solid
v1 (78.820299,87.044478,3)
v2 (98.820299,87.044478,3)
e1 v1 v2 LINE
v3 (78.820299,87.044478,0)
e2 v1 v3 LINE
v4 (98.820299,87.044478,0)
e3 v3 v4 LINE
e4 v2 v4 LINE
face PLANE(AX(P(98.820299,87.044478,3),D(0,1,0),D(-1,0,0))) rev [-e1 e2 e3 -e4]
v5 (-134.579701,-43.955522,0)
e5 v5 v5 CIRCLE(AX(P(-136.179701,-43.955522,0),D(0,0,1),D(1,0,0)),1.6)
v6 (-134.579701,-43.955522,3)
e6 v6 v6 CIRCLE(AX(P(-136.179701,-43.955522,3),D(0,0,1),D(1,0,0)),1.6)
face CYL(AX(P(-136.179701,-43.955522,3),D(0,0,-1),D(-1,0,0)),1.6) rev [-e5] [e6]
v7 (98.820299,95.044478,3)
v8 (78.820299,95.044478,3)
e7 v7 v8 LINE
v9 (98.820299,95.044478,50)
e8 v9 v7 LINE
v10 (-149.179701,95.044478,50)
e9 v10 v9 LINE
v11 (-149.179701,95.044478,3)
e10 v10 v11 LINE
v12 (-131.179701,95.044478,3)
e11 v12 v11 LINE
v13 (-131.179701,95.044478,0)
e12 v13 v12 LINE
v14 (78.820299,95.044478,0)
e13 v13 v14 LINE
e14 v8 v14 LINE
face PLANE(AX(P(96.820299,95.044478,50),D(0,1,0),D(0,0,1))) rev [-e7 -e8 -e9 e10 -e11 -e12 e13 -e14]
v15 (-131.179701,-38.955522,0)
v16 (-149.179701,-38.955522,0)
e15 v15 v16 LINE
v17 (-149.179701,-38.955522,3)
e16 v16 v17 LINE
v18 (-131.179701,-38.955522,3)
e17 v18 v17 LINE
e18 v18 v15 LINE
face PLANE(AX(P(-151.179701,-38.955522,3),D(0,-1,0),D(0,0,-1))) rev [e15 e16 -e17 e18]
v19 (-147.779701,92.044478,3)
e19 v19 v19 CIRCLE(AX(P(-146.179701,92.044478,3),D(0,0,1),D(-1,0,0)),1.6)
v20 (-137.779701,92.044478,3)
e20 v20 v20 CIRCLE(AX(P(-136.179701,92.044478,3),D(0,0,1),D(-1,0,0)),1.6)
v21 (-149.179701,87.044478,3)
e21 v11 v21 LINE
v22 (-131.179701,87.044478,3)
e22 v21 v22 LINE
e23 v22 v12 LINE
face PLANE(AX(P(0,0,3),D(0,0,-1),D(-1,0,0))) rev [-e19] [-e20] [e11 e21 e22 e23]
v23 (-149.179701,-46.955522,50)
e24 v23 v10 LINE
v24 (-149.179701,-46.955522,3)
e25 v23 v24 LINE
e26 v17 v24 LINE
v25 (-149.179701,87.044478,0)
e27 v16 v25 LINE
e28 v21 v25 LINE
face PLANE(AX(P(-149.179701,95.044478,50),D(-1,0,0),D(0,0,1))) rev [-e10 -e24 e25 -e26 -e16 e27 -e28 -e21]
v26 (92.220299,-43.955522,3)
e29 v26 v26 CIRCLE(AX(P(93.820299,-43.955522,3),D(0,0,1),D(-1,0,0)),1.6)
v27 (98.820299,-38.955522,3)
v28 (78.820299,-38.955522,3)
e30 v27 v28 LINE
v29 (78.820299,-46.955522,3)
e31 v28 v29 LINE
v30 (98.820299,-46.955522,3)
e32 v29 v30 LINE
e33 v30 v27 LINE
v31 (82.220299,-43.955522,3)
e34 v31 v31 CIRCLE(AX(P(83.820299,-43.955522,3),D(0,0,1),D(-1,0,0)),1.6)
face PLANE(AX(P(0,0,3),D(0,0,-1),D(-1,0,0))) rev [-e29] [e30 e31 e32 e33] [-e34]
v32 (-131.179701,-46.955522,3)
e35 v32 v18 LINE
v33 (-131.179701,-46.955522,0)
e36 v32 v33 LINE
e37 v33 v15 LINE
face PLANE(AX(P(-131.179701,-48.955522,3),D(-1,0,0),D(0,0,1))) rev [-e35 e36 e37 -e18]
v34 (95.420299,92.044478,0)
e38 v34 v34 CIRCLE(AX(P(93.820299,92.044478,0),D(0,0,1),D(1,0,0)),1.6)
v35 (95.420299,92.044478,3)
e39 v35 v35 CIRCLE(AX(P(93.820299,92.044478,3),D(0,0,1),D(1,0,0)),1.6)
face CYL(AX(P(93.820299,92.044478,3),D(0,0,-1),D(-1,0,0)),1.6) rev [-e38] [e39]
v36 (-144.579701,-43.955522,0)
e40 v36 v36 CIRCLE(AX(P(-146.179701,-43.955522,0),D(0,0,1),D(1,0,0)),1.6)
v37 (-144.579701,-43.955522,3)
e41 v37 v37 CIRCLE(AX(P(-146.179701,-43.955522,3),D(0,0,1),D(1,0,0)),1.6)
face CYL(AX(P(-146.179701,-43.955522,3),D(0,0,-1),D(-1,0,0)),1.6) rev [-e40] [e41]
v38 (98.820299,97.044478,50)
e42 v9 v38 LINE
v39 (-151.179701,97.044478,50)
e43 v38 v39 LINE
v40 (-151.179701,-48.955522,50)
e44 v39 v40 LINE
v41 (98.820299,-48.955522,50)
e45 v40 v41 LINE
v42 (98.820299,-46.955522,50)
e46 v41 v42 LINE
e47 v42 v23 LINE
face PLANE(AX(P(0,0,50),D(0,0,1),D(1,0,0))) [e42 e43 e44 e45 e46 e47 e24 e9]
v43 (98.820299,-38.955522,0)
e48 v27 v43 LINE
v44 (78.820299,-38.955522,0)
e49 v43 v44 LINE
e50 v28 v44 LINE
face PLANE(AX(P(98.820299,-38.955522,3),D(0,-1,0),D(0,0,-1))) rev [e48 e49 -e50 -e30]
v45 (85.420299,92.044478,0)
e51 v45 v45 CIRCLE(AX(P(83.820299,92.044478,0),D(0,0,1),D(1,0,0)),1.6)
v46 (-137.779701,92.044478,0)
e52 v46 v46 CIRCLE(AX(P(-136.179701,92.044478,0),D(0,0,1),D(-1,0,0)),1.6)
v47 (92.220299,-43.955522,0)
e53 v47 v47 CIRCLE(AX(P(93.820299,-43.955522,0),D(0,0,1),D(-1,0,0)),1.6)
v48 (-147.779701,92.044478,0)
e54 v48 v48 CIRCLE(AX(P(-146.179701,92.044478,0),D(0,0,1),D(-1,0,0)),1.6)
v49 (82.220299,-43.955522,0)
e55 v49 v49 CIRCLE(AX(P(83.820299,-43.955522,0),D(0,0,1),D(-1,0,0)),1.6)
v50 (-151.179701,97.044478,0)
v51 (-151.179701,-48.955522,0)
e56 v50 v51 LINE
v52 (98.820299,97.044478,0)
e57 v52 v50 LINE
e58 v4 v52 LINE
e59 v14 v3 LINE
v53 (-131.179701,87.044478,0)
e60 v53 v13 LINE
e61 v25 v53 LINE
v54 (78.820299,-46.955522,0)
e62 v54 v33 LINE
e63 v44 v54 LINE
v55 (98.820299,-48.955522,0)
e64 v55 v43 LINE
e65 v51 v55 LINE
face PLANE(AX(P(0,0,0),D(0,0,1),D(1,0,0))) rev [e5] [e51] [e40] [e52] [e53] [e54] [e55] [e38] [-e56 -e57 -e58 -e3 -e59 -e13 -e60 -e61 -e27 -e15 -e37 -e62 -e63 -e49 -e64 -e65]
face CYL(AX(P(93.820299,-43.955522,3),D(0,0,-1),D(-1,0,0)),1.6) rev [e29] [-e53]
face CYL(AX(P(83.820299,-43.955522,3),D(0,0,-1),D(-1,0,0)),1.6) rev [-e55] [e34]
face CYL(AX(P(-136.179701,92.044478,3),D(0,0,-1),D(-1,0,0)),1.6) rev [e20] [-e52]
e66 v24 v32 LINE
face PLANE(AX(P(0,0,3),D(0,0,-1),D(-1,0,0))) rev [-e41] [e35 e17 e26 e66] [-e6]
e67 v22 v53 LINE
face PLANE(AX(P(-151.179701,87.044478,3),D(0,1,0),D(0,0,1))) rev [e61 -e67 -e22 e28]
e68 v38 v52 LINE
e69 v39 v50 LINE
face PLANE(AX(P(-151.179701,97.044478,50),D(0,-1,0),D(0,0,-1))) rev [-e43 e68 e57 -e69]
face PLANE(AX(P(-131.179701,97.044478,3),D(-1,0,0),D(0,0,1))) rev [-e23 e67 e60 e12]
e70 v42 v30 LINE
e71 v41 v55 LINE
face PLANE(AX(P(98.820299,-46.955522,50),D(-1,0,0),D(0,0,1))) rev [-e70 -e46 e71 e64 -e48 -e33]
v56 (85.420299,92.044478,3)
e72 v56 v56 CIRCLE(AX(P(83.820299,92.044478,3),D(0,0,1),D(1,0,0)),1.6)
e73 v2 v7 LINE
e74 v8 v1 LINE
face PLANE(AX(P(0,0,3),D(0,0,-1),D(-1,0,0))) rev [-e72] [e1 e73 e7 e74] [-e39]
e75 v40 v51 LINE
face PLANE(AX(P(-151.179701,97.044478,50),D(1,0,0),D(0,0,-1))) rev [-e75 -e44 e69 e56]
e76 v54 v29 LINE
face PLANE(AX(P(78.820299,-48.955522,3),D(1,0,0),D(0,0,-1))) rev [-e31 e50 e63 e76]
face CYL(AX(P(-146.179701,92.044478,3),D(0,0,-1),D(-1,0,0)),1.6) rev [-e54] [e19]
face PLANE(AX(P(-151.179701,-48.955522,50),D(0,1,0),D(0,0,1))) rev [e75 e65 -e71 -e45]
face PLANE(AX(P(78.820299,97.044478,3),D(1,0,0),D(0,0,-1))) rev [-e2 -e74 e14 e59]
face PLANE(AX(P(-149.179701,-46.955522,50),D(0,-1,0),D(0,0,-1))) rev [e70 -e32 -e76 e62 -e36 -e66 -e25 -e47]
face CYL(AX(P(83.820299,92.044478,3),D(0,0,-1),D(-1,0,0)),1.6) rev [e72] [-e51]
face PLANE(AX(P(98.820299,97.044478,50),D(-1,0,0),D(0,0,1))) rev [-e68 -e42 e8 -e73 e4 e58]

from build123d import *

# Parameters (mm, degrees)
EXTRUDE_1_DEPTH = 50
SKETCH_2_W      = 20
SKETCH_2_H      = 10
SKETCH_2_R      = 1.6
EXTRUDE_2_DEPTH = 3


with BuildPart() as part:
    # 草图1 → 凸台-拉伸1 (new body)
    with BuildSketch(Plane.XY):
        Polygon((-151.179701436, 97.04447756), (98.820298564, 97.04447756), (98.820298564, 95.04447756), (96.820298564, 95.04447756), (-149.179701436, 95.04447756), (-149.179701436, -46.95552244), (96.820298564, -46.95552244), (98.820298564, -46.95552244), (98.820298564, -48.95552244), (-151.179701436, -48.95552244), align=None)
    extrude(amount=EXTRUDE_1_DEPTH)

    # 草图2 → 凸台-拉伸2 (add)
    # profile 1 of 4: a face of its own
    with BuildSketch(Plane.XY):
        with Locations((-141.179701436, -43.95552244)):
            Rectangle(SKETCH_2_W, SKETCH_2_H)
        with Locations((-146.179701436, -43.95552244)):
            Circle(SKETCH_2_R, mode=Mode.SUBTRACT)
        with Locations((-136.179701436, -43.95552244)):
            Circle(SKETCH_2_R, mode=Mode.SUBTRACT)
    # profile 2 of 4: a face of its own
    with BuildSketch(Plane.XY):
        with Locations((88.820298564, -43.95552244)):
            Rectangle(SKETCH_2_W, SKETCH_2_H)
        with Locations((83.820298564, -43.95552244)):
            Circle(SKETCH_2_R, mode=Mode.SUBTRACT)
        with Locations((93.820298564, -43.95552244)):
            Circle(SKETCH_2_R, mode=Mode.SUBTRACT)
    # profile 3 of 4: a face of its own
    with BuildSketch(Plane.XY):
        with Locations((88.820298564, 92.04447756)):
            Rectangle(SKETCH_2_W, SKETCH_2_H)
        with Locations((93.820298564, 92.04447756)):
            Circle(SKETCH_2_R, mode=Mode.SUBTRACT)
        with Locations((83.820298564, 92.04447756)):
            Circle(SKETCH_2_R, mode=Mode.SUBTRACT)
    # profile 4 of 4: a face of its own
    with BuildSketch(Plane.XY):
        with Locations((-141.179701436, 92.04447756)):
            Rectangle(SKETCH_2_W, SKETCH_2_H)
        with Locations((-136.179701436, 92.04447756)):
            Circle(SKETCH_2_R, mode=Mode.SUBTRACT)
        with Locations((-146.179701436, 92.04447756)):
            Circle(SKETCH_2_R, mode=Mode.SUBTRACT)
    extrude(amount=EXTRUDE_2_DEPTH)


solid = part.part
